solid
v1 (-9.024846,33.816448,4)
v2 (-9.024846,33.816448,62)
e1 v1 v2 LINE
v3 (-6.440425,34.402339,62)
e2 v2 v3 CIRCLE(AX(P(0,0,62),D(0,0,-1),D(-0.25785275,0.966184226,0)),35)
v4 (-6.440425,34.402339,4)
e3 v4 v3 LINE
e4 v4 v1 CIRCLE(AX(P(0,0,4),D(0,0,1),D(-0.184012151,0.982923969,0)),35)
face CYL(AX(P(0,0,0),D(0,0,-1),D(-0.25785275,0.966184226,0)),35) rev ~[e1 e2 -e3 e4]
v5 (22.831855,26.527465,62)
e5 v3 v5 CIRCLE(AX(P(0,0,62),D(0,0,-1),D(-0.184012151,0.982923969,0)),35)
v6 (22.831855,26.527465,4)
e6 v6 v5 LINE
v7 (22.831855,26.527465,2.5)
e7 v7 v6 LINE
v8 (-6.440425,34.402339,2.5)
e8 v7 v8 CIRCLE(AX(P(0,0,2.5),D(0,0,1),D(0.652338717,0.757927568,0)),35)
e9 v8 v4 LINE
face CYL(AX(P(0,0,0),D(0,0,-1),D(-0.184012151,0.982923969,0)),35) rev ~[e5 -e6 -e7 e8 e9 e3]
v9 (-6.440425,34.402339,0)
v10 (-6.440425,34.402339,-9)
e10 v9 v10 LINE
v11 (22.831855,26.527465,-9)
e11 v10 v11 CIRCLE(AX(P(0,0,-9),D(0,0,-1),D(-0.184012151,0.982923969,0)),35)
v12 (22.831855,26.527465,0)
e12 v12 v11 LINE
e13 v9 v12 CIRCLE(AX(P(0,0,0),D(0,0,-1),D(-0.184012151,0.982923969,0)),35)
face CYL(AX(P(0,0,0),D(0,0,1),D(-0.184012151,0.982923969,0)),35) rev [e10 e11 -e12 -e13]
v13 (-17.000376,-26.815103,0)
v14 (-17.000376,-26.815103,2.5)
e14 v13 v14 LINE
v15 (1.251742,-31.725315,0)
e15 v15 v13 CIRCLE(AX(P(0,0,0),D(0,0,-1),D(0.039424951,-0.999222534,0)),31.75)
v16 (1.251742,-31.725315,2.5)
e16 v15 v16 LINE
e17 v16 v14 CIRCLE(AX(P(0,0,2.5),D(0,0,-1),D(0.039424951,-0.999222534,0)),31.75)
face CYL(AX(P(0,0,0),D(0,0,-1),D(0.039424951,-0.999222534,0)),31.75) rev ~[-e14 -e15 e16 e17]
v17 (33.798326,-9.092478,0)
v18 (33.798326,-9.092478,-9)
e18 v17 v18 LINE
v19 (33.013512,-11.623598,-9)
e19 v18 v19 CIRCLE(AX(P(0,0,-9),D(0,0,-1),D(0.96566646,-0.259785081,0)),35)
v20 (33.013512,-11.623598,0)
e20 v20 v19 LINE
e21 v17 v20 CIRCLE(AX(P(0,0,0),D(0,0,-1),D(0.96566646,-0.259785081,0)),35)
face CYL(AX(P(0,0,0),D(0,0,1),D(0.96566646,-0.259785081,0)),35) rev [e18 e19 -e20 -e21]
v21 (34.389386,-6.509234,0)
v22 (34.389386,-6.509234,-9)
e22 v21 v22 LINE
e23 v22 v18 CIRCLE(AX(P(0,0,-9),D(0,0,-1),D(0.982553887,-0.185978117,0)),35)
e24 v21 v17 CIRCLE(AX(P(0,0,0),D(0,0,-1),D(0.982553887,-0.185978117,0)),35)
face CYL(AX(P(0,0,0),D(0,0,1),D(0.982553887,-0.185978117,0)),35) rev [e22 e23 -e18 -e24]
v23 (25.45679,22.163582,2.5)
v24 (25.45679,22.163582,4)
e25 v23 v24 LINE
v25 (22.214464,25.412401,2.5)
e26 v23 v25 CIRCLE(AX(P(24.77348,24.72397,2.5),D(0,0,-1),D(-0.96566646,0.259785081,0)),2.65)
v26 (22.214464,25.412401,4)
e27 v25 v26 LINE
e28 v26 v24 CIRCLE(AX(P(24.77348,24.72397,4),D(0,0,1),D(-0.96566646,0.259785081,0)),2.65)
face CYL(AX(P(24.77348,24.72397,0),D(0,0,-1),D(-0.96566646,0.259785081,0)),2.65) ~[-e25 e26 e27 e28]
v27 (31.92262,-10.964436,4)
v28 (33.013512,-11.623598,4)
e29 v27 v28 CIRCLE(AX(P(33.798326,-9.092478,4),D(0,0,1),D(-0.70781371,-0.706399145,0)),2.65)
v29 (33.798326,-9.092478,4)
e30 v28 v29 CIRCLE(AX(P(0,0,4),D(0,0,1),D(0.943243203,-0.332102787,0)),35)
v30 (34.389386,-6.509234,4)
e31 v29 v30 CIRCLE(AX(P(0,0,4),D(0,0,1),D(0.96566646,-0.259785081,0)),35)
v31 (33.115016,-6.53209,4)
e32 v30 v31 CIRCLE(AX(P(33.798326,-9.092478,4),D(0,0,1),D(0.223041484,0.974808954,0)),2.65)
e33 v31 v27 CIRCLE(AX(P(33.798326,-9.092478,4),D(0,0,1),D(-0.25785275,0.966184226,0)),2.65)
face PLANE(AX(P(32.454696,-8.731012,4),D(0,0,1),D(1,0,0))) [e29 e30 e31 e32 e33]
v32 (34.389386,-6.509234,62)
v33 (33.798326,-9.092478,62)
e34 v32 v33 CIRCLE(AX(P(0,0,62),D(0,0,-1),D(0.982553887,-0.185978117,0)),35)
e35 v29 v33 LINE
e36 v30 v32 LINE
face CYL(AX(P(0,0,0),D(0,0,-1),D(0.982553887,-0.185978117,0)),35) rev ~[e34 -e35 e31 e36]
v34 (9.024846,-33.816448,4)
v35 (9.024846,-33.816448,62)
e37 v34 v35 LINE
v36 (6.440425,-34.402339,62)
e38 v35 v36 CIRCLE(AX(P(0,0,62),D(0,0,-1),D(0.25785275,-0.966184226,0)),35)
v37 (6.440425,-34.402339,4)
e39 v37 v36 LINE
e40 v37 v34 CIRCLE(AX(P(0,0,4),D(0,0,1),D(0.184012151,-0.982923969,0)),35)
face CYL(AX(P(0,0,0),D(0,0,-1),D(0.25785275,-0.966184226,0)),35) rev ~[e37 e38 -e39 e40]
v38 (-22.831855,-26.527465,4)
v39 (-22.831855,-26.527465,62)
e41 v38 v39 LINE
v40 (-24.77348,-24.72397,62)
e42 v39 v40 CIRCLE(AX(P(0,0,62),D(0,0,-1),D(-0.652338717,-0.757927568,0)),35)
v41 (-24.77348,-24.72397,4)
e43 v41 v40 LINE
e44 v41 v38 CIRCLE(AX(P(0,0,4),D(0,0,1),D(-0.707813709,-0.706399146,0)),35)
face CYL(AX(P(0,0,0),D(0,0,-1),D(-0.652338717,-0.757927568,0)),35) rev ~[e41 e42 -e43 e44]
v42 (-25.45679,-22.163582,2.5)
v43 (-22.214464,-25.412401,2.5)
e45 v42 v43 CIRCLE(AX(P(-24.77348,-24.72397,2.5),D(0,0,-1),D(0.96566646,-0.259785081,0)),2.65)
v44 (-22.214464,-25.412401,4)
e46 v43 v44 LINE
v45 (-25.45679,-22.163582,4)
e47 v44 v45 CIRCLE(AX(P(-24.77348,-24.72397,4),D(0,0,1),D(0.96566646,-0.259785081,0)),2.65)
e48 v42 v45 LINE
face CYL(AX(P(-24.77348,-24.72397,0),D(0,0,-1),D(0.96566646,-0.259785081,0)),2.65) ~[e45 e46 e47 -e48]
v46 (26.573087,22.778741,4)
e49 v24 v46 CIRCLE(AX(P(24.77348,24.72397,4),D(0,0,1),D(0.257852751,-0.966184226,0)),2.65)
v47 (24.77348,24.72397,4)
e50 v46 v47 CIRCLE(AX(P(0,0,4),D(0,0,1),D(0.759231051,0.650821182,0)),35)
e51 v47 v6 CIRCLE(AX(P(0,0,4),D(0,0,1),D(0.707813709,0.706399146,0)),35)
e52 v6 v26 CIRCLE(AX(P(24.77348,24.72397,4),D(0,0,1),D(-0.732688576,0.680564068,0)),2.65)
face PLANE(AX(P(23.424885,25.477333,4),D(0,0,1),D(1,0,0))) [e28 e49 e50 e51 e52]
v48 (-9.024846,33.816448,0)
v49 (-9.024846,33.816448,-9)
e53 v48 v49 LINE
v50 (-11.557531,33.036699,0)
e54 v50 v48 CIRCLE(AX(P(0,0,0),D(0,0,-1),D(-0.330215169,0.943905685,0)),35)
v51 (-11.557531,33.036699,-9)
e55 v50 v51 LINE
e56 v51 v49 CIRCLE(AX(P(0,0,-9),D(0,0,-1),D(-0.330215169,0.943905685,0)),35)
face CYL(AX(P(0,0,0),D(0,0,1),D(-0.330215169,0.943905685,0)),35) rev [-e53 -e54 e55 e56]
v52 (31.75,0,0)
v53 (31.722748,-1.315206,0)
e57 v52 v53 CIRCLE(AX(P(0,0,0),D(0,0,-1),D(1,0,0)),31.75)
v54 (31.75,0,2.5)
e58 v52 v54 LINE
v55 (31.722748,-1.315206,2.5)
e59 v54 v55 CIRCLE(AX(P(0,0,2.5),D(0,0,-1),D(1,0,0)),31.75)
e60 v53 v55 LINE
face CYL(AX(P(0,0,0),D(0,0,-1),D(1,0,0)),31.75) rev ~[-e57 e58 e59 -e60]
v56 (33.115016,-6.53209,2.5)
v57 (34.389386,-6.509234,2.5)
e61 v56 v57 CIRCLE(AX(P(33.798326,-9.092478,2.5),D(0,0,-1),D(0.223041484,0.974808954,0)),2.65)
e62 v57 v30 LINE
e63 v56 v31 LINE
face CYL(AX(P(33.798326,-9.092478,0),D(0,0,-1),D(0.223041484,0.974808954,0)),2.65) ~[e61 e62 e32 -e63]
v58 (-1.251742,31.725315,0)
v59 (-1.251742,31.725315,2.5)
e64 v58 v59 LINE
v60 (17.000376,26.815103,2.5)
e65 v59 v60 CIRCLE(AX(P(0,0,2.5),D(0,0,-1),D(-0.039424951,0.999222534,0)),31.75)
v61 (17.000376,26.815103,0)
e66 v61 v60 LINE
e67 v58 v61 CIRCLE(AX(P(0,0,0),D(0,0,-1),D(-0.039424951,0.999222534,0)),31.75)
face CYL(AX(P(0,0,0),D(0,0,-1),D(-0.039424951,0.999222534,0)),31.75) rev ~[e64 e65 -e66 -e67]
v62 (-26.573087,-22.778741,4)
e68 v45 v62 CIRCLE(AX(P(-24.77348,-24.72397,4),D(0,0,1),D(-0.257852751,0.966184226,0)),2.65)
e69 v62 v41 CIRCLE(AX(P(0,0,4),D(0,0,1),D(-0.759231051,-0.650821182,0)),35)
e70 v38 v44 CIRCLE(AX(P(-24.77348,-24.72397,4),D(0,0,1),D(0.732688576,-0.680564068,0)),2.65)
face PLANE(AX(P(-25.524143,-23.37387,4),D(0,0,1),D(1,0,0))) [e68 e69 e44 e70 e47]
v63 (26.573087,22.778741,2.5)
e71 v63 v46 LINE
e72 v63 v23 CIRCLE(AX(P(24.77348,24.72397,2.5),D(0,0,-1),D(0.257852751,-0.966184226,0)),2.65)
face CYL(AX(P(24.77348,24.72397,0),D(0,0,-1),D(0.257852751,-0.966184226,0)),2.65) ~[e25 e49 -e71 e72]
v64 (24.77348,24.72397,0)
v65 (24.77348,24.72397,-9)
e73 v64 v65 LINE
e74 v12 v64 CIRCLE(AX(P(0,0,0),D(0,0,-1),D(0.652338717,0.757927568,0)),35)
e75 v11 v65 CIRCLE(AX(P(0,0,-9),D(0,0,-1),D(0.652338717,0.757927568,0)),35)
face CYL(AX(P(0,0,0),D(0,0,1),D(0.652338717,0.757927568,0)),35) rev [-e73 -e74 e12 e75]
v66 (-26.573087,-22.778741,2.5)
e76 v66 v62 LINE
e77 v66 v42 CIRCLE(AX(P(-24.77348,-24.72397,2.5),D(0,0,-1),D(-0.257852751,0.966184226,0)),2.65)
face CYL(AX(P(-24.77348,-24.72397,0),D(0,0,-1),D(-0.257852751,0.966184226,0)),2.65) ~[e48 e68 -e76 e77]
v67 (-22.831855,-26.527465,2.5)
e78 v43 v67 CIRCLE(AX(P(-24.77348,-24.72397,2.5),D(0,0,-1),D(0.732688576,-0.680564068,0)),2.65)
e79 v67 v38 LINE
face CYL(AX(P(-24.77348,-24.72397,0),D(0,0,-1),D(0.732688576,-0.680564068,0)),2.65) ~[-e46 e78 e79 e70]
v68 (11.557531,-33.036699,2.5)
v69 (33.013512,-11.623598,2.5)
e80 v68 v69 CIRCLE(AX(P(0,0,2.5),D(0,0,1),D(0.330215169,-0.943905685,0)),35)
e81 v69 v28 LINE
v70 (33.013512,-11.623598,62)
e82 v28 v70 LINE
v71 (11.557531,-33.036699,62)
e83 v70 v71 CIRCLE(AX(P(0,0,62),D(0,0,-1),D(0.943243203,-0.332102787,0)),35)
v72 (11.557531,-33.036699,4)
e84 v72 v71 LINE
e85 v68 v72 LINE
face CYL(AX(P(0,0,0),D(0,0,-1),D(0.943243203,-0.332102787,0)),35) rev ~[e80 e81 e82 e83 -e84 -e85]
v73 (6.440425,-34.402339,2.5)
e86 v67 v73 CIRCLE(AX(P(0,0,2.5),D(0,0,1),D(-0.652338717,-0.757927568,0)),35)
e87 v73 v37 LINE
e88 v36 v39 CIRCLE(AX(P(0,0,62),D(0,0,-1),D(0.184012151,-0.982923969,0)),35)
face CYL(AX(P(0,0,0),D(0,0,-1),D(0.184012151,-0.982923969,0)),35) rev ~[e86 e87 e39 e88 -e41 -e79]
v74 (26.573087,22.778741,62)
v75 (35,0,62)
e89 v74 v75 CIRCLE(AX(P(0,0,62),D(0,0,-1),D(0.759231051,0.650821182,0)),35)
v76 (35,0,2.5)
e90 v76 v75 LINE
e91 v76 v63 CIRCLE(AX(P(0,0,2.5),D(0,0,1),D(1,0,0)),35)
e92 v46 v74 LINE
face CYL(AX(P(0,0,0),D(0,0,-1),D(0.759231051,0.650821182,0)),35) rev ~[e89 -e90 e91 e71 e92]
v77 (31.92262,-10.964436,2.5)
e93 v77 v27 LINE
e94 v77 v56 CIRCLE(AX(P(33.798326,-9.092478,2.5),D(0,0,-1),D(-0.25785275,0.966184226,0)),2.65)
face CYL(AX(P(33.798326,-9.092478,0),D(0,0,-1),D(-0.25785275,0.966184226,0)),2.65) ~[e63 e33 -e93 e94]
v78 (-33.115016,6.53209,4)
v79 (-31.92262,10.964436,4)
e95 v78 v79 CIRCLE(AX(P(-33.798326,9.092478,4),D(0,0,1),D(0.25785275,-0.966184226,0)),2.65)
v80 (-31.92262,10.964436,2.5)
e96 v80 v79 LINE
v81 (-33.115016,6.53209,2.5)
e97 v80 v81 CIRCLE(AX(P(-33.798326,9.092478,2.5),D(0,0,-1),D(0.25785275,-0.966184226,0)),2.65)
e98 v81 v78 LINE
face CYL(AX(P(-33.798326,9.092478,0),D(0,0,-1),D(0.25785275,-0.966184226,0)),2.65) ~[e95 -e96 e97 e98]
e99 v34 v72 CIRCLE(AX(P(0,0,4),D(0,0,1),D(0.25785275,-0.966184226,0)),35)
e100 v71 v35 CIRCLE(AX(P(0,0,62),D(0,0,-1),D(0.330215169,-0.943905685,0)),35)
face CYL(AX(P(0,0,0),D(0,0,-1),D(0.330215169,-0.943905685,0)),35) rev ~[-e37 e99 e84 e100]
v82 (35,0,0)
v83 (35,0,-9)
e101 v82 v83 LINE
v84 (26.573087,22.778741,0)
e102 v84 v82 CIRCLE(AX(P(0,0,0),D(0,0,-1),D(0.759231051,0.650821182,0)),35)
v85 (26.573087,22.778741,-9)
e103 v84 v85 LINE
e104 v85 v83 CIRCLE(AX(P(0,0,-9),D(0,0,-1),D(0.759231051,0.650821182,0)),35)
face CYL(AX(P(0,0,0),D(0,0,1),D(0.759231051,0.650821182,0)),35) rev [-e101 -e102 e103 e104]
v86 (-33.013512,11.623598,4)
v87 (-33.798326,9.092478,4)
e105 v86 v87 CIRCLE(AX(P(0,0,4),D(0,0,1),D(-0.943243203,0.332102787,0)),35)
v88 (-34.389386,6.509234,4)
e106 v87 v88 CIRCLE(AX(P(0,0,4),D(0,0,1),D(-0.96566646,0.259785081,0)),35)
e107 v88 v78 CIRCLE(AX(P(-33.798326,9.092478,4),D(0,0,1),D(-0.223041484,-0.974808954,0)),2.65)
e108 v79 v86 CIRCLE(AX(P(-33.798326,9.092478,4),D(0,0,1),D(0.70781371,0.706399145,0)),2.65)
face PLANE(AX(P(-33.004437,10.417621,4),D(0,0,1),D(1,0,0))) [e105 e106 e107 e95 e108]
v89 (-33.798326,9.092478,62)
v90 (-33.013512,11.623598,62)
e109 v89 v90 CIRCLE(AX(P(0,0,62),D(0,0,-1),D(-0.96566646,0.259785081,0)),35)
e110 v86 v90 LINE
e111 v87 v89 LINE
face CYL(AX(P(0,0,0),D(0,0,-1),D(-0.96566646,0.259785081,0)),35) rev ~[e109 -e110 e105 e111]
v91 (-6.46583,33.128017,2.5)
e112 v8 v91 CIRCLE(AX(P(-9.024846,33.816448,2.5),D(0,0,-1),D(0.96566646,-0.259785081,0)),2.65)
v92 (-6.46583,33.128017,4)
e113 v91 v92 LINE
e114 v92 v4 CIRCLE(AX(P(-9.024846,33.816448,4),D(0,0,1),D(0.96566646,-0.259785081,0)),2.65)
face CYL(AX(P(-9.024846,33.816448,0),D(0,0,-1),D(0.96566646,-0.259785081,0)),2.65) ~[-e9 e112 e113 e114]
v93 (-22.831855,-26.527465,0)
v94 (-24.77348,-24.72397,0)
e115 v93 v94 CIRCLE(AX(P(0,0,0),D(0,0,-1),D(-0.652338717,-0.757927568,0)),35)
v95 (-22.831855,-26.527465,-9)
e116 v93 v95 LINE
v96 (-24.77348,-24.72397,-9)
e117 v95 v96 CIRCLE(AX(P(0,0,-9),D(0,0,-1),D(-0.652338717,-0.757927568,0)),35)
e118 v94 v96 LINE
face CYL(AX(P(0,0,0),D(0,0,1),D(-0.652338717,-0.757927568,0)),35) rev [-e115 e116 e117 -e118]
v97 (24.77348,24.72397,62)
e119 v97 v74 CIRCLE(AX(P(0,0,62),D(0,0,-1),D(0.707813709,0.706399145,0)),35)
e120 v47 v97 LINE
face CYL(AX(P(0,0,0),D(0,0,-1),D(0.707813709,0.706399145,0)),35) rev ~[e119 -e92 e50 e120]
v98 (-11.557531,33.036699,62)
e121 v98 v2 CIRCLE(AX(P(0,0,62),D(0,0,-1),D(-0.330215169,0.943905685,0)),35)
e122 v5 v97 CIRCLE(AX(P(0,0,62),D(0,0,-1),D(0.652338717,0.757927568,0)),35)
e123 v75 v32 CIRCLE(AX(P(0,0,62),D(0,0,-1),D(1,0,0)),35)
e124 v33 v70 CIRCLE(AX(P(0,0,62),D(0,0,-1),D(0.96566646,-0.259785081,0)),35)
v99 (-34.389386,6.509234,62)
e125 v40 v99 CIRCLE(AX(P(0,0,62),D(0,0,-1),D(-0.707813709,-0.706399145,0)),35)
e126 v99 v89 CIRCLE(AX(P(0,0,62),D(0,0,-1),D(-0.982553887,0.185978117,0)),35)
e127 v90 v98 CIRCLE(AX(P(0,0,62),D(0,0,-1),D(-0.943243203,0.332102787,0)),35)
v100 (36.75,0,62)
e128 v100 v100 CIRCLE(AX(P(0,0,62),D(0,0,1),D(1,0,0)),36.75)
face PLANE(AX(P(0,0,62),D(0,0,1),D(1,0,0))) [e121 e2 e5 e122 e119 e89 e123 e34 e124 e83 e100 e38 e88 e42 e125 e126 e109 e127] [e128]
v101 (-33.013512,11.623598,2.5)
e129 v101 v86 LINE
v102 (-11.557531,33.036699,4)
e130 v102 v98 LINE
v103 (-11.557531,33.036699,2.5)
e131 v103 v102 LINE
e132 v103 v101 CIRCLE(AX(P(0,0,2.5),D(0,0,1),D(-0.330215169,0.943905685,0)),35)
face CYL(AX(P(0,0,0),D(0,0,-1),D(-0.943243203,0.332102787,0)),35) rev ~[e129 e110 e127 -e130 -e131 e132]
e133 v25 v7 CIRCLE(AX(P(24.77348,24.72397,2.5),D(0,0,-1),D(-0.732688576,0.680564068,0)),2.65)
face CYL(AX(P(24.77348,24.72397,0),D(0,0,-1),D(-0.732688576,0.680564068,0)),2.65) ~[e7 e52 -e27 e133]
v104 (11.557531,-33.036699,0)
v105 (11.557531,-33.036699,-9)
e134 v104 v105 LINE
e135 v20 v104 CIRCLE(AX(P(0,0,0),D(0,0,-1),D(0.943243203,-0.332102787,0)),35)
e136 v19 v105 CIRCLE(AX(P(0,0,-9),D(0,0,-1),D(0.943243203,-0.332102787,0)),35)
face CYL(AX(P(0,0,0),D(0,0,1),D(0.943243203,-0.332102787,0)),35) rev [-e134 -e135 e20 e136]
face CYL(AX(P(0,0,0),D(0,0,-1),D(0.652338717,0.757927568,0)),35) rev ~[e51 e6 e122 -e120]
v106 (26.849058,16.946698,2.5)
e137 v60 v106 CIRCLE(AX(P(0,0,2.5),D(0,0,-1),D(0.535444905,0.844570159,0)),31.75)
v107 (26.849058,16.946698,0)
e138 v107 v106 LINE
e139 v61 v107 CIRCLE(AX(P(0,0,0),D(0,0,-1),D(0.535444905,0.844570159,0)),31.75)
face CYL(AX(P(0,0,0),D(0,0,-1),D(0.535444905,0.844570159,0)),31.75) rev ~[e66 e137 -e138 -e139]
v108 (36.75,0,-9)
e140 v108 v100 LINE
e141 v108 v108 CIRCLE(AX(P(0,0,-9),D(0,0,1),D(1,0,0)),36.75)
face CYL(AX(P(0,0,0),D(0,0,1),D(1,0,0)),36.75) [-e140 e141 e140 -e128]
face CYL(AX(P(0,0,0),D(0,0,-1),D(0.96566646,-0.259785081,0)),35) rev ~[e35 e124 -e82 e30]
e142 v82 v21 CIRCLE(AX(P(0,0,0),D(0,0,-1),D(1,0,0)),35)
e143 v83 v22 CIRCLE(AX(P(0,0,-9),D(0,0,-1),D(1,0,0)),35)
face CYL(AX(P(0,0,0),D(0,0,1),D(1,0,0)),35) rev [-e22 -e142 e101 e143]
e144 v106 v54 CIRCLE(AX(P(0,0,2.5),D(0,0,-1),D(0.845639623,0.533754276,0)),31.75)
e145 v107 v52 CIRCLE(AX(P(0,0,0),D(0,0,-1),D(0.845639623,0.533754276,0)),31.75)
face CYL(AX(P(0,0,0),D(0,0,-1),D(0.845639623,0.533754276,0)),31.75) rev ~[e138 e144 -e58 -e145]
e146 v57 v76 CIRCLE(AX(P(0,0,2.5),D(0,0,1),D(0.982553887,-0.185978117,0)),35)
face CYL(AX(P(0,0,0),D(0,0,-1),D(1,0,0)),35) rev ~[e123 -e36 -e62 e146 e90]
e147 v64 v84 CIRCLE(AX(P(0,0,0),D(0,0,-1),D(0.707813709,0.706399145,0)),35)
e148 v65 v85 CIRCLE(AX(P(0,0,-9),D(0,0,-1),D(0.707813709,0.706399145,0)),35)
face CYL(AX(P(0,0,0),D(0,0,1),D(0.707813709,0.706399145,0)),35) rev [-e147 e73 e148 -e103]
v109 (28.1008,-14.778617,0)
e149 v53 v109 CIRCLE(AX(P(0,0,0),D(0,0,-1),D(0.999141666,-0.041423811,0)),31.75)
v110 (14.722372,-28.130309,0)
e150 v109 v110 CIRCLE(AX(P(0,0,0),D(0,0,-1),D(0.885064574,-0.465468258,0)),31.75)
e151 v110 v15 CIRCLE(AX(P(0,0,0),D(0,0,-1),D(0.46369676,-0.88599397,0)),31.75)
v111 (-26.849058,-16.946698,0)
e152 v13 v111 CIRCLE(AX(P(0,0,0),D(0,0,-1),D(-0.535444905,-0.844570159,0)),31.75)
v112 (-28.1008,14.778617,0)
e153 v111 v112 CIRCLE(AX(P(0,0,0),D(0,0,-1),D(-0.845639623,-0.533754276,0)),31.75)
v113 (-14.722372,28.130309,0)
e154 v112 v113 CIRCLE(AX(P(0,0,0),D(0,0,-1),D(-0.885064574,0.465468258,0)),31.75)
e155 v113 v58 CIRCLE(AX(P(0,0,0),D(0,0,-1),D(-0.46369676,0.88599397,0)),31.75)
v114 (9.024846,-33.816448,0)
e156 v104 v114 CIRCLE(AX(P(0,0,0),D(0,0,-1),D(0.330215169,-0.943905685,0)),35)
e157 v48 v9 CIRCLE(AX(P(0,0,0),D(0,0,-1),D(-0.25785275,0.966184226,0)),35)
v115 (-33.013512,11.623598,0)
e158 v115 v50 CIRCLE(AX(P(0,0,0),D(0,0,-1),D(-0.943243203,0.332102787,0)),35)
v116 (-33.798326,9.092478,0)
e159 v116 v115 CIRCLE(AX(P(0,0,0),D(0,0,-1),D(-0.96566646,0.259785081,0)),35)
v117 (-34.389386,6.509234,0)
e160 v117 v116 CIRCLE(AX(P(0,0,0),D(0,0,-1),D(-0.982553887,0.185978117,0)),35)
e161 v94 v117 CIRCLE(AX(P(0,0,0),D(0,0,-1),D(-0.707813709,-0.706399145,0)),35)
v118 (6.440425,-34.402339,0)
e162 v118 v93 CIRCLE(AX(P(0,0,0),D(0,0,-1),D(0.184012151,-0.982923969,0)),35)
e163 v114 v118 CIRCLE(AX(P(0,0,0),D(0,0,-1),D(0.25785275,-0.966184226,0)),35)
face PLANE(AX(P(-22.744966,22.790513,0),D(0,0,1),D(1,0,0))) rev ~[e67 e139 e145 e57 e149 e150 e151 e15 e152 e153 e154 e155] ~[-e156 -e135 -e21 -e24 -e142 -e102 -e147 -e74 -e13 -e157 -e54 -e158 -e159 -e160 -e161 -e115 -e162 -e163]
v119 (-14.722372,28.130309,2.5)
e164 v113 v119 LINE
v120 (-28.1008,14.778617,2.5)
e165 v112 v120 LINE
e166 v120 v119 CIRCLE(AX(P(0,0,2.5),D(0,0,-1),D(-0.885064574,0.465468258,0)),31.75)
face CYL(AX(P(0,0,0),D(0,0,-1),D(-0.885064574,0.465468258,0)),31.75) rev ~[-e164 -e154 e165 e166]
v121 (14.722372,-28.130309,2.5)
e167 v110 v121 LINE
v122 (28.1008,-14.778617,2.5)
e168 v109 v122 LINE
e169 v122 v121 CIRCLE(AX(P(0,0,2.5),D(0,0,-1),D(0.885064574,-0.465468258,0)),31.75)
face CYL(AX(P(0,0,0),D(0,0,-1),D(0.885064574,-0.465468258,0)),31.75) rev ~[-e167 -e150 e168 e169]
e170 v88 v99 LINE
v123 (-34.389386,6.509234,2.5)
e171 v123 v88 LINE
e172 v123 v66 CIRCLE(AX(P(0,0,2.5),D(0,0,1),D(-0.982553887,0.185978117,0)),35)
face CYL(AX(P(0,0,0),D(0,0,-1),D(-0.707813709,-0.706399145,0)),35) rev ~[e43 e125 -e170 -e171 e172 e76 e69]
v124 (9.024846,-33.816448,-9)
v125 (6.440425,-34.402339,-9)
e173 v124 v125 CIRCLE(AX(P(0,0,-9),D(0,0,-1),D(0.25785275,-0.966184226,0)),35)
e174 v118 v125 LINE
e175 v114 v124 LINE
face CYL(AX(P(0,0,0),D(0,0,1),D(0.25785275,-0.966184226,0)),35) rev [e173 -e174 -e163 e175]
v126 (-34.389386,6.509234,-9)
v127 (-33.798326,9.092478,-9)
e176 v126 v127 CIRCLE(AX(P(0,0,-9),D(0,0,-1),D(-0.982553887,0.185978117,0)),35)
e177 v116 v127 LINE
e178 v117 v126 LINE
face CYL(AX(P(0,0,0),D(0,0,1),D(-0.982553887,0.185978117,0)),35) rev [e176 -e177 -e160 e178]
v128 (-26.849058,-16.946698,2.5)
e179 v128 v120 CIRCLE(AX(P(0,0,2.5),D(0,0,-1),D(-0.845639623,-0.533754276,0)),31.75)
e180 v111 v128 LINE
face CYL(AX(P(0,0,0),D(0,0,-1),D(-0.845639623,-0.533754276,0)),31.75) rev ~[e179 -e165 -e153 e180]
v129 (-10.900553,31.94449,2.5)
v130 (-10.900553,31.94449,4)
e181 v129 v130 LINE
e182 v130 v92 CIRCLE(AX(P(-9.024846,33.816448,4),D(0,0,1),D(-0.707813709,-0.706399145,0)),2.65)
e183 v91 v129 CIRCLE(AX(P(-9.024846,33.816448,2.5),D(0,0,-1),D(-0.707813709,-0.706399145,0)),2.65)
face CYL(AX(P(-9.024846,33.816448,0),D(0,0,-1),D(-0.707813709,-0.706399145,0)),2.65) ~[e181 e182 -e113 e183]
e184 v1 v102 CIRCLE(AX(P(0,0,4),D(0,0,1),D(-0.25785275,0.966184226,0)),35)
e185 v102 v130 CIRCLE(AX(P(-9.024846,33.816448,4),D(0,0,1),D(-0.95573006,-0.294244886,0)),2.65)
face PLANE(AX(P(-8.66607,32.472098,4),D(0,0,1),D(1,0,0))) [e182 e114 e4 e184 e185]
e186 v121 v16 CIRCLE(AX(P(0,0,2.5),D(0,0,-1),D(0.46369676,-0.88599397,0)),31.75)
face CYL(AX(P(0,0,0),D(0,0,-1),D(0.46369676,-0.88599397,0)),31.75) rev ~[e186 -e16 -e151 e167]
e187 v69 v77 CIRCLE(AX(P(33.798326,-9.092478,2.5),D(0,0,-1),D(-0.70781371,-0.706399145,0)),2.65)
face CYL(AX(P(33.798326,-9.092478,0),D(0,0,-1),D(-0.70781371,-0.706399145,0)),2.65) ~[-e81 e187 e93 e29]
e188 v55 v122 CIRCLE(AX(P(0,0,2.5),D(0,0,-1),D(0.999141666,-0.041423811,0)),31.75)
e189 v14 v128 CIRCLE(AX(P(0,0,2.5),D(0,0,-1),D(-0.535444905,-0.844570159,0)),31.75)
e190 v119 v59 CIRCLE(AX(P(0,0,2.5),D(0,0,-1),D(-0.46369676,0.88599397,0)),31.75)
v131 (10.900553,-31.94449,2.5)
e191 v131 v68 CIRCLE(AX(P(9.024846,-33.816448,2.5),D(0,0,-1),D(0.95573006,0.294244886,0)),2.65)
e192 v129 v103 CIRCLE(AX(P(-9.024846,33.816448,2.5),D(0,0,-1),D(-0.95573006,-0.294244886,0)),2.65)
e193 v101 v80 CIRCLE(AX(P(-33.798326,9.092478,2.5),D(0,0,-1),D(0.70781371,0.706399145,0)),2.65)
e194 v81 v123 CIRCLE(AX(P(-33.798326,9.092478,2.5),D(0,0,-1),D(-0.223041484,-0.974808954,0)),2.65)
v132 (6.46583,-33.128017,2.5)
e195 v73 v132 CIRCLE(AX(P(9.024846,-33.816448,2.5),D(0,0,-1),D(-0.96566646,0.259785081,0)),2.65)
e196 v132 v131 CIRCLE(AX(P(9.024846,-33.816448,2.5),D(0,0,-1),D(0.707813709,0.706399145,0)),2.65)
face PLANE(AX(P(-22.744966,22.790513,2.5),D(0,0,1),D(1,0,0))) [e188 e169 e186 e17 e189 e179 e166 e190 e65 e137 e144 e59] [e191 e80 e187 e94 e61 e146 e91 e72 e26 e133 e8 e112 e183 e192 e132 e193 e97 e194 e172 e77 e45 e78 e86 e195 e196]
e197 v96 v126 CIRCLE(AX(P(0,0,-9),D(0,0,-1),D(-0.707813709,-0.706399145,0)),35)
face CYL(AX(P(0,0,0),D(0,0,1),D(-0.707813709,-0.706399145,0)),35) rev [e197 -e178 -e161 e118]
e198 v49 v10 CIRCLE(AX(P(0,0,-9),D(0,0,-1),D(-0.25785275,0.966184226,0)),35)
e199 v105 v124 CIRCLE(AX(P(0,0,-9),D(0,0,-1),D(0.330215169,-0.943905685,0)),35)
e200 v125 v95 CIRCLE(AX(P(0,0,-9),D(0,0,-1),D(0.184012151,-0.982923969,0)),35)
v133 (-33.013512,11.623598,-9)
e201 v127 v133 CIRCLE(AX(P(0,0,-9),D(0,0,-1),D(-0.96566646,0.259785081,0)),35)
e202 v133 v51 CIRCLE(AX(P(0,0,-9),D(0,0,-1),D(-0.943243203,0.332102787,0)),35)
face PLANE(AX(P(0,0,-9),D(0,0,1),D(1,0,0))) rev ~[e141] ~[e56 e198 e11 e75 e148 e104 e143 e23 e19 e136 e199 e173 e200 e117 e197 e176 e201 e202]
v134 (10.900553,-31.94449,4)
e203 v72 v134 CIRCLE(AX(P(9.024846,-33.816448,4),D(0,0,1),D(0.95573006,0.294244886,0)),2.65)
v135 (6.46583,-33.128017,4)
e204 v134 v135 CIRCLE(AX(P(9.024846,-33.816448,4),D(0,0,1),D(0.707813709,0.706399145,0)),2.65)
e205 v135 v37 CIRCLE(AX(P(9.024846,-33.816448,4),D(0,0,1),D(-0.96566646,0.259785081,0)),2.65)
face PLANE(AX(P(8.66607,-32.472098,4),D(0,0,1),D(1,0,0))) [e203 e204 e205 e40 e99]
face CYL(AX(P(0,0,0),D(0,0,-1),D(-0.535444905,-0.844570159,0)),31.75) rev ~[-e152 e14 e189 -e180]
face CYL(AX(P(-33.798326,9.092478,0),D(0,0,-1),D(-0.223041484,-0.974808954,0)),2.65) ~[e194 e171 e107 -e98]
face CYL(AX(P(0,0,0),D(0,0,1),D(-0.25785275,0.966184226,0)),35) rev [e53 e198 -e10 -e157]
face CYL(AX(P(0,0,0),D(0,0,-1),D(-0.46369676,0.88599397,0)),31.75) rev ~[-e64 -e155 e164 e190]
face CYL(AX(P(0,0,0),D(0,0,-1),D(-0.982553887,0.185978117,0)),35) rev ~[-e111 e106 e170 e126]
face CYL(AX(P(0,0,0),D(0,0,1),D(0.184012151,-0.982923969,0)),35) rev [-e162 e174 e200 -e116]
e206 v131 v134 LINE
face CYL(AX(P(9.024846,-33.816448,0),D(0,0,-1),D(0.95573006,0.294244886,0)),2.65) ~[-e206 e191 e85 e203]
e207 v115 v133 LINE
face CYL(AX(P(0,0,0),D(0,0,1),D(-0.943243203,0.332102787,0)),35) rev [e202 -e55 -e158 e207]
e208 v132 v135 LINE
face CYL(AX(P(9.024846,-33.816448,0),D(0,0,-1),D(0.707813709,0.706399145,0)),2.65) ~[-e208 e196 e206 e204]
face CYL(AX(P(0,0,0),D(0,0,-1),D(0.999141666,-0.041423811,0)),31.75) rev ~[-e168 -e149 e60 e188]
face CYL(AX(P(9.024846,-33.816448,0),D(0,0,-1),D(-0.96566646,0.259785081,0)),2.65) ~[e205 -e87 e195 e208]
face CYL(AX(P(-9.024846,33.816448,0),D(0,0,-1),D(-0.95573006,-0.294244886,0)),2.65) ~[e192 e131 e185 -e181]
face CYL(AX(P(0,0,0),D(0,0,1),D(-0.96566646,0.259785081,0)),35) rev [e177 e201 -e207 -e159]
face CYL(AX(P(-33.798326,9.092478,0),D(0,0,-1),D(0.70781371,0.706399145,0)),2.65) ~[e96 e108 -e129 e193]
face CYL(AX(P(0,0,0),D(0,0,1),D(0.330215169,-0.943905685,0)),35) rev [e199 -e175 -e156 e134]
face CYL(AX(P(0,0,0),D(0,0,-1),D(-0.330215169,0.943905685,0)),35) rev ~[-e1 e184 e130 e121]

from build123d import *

# Parameters (mm, degrees)
F0_R     = 36.75
F1_DEPTH = 9
F2_DEPTH = 62
F3_DEPTH = 2.5
F4_DEPTH = 4


# Not quite as in the source:
# - a feature names something its author has since deleted; it is built from what else it names


with BuildPart() as f1:
    # F0 (on Top) → F1 (new body)
    with BuildSketch(Plane.XY):
        Circle(F0_R)
        with BuildLine():
            ThreePointArc((26.5730867913, 22.7787413695), (32.825737141, 12.1437630556), (35, 0))
            ThreePointArc((35, 0), (34.847012146, -3.2689057028), (34.3893860289, -6.5092340988))
            ThreePointArc((34.3893860289, -6.5092340988), (34.1183133858, -7.8064519285), (33.7983260972, -9.0924778266))
            ThreePointArc((33.7983260972, -9.0924778266), (33.4298829217, -10.3654680472), (33.0135120879, -11.6235975335))
            ThreePointArc((33.0135120879, -11.6235975335), (24.7239700923, -24.7734798298), (11.5575309257, -33.036698971))
            ThreePointArc((11.5575309257, -33.036698971), (10.2985710094, -33.4505520906), (9.0248462674, -33.8164479189))
            ThreePointArc((9.0248462674, -33.8164479189), (7.7381828098, -34.1338618794), (6.4404252966, -34.402338903))
            ThreePointArc((6.4404252966, -34.402338903), (-9.0924778266, -33.7983260972), (-22.8318551032, -26.5274648722))
            ThreePointArc((-22.8318551032, -26.5274648722), (-23.8197423763, -25.6441001621), (-24.7734798298, -24.7239700923))
            ThreePointArc((-24.7734798298, -24.7239700923), (-25.6917001119, -23.7683938321), (-26.5730867913, -22.7787413695))
            ThreePointArc((-26.5730867913, -22.7787413695), (-33.8164479189, -9.0248462674), (-34.3893860289, 6.5092340988))
            ThreePointArc((-34.3893860289, 6.5092340988), (-34.1183133858, 7.8064519285), (-33.7983260972, 9.0924778266))
            ThreePointArc((-33.7983260972, 9.0924778266), (-33.4298829217, 10.3654680472), (-33.0135120879, 11.6235975335))
            ThreePointArc((-33.0135120879, 11.6235975335), (-24.7239700923, 24.7734798298), (-11.5575309257, 33.036698971))
            ThreePointArc((-11.5575309257, 33.036698971), (-10.2985710094, 33.4505520906), (-9.0248462674, 33.8164479189))
            ThreePointArc((-9.0248462674, 33.8164479189), (-7.7381828098, 34.1338618794), (-6.4404252966, 34.402338903))
            ThreePointArc((-6.4404252966, 34.402338903), (9.0924778266, 33.7983260972), (22.8318551032, 26.5274648722))
            ThreePointArc((22.8318551032, 26.5274648722), (23.8197423763, 25.6441001621), (24.7734798298, 24.7239700923))
            ThreePointArc((24.7734798298, 24.7239700923), (25.6917001119, 23.7683938321), (26.5730867913, 22.7787413695))
        make_face(mode=Mode.SUBTRACT)
    extrude(amount=-F1_DEPTH)

    # F0 (on Top) → F2 (join)
    with BuildSketch(Plane.XY):
        Circle(F0_R)
        with BuildLine():
            ThreePointArc((26.5730867913, 22.7787413695), (32.825737141, 12.1437630556), (35, 0))
            ThreePointArc((35, 0), (34.847012146, -3.2689057028), (34.3893860289, -6.5092340988))
            ThreePointArc((34.3893860289, -6.5092340988), (34.1183133858, -7.8064519285), (33.7983260972, -9.0924778266))
            ThreePointArc((33.7983260972, -9.0924778266), (33.4298829217, -10.3654680472), (33.0135120879, -11.6235975335))
            ThreePointArc((33.0135120879, -11.6235975335), (24.7239700923, -24.7734798298), (11.5575309257, -33.036698971))
            ThreePointArc((11.5575309257, -33.036698971), (10.2985710094, -33.4505520906), (9.0248462674, -33.8164479189))
            ThreePointArc((9.0248462674, -33.8164479189), (7.7381828098, -34.1338618794), (6.4404252966, -34.402338903))
            ThreePointArc((6.4404252966, -34.402338903), (-9.0924778266, -33.7983260972), (-22.8318551032, -26.5274648722))
            ThreePointArc((-22.8318551032, -26.5274648722), (-23.8197423763, -25.6441001621), (-24.7734798298, -24.7239700923))
            ThreePointArc((-24.7734798298, -24.7239700923), (-25.6917001119, -23.7683938321), (-26.5730867913, -22.7787413695))
            ThreePointArc((-26.5730867913, -22.7787413695), (-33.8164479189, -9.0248462674), (-34.3893860289, 6.5092340988))
            ThreePointArc((-34.3893860289, 6.5092340988), (-34.1183133858, 7.8064519285), (-33.7983260972, 9.0924778266))
            ThreePointArc((-33.7983260972, 9.0924778266), (-33.4298829217, 10.3654680472), (-33.0135120879, 11.6235975335))
            ThreePointArc((-33.0135120879, 11.6235975335), (-24.7239700923, 24.7734798298), (-11.5575309257, 33.036698971))
            ThreePointArc((-11.5575309257, 33.036698971), (-10.2985710094, 33.4505520906), (-9.0248462674, 33.8164479189))
            ThreePointArc((-9.0248462674, 33.8164479189), (-7.7381828098, 34.1338618794), (-6.4404252966, 34.402338903))
            ThreePointArc((-6.4404252966, 34.402338903), (9.0924778266, 33.7983260972), (22.8318551032, 26.5274648722))
            ThreePointArc((22.8318551032, 26.5274648722), (23.8197423763, 25.6441001621), (24.7734798298, 24.7239700923))
            ThreePointArc((24.7734798298, 24.7239700923), (25.6917001119, 23.7683938321), (26.5730867913, 22.7787413695))
        make_face(mode=Mode.SUBTRACT)
    extrude(amount=F2_DEPTH)

    # F0 (on Top) → F3 (join)
    with BuildSketch(Plane.XY):
        with BuildLine():
            ThreePointArc((-10.9005525974, 31.9444901833), (-11.2956848318, 32.4505078709), (-11.5575309257, 33.036698971))
            ThreePointArc((-11.5575309257, 33.036698971), (-24.7239700923, 24.7734798298), (-33.0135120879, 11.6235975335))
            ThreePointArc((-33.0135120879, 11.6235975335), (-32.4278459824, 11.3605792915), (-31.9226197672, 10.9644355621))
            Line((-31.9226197672, 10.9644355621), (-28.1008002305, 14.7786172021))
            ThreePointArc((-28.1008002305, 14.7786172021), (-22.4281728694, 22.4730852741), (-14.7223721342, 28.1303085433))
            Line((-14.7223721342, 28.1303085433), (-10.9005525974, 31.9444901833))
        make_face()
        with BuildLine():
            ThreePointArc((-31.7227478819, 1.3152059995), (-30.6599101025, 8.2481763141), (-28.1008002305, 14.7786172021))
            Line((-28.1008002305, 14.7786172021), (-31.9226197672, 10.9644355621))
            ThreePointArc((-31.9226197672, 10.9644355621), (-31.2393099784, 8.4040473626), (-33.1150163084, 6.532089627))
            Line((-33.1150163084, 6.532089627), (-31.7227478819, 1.3152059995))
        make_face()
        with BuildLine():
            ThreePointArc((-26.8490580451, -16.9466982652), (-30.6763491835, -8.1868248283), (-31.7227478819, 1.3152059995))
            Line((-31.7227478819, 1.3152059995), (-33.1150163084, 6.532089627))
            ThreePointArc((-33.1150163084, 6.532089627), (-33.7508065978, 6.442903918), (-34.3893860289, 6.5092340988))
            ThreePointArc((-34.3893860289, 6.5092340988), (-33.8164479189, -9.0248462674), (-26.5730867913, -22.7787413695))
            ThreePointArc((-26.5730867913, -22.7787413695), (-26.0524732593, -22.4030487651), (-25.4567896186, -22.1635818927))
            Line((-25.4567896186, -22.1635818927), (-26.8490580451, -16.9466982652))
        make_face()
        with BuildLine():
            Line((-31.9226197672, 10.9644355621), (-33.7983260972, 9.0924778266))
            Line((-33.7983260972, 9.0924778266), (-33.1150163084, 6.532089627))
            ThreePointArc((-33.1150163084, 6.532089627), (-31.2393099784, 8.4040473626), (-31.9226197672, 10.9644355621))
        make_face()
        with BuildLine():
            ThreePointArc((-31.9226197672, 10.9644355621), (-32.4278459824, 11.3605792915), (-33.0135120879, 11.6235975335))
            ThreePointArc((-33.0135120879, 11.6235975335), (-33.4298829217, 10.3654680472), (-33.7983260972, 9.0924778266))
            Line((-33.7983260972, 9.0924778266), (-31.9226197672, 10.9644355621))
        make_face()
        with BuildLine():
            Line((-33.1150163084, 6.532089627), (-33.7983260972, 9.0924778266))
            ThreePointArc((-33.7983260972, 9.0924778266), (-34.1183133858, 7.8064519285), (-34.3893860289, 6.5092340988))
            ThreePointArc((-34.3893860289, 6.5092340988), (-33.7508065978, 6.442903918), (-33.1150163084, 6.532089627))
        make_face()
        with BuildLine():
            Line((-22.214463711, -25.4124005563), (-17.0003757477, -26.8151025438))
            ThreePointArc((-17.0003757477, -26.8151025438), (-22.4730852741, -22.4281728694), (-26.8490580451, -16.9466982652))
            Line((-26.8490580451, -16.9466982652), (-25.4567896186, -22.1635818927))
            ThreePointArc((-25.4567896186, -22.1635818927), (-22.8977734998, -22.8520123567), (-22.214463711, -25.4124005563))
        make_face()
        with BuildLine():
            ThreePointArc((-22.8318551032, -26.5274648722), (-9.0924778266, -33.7983260972), (6.4404252966, -34.402338903))
            ThreePointArc((6.4404252966, -34.402338903), (6.3753727231, -33.7636280565), (6.4658301487, -33.1280174548))
            Line((6.4658301487, -33.1280174548), (1.2517421854, -31.7253154673))
            ThreePointArc((1.2517421854, -31.7253154673), (-8.2481763141, -30.6599101025), (-17.0003757477, -26.8151025438))
            Line((-17.0003757477, -26.8151025438), (-22.214463711, -25.4124005563))
            ThreePointArc((-22.214463711, -25.4124005563), (-22.455121766, -26.0076039529), (-22.8318551032, -26.5274648722))
        make_face()
        with BuildLine():
            Line((-25.4567896186, -22.1635818927), (-24.7734798298, -24.7239700923))
            Line((-24.7734798298, -24.7239700923), (-22.214463711, -25.4124005563))
            ThreePointArc((-22.214463711, -25.4124005563), (-22.8977734998, -22.8520123567), (-25.4567896186, -22.1635818927))
        make_face()
        with BuildLine():
            ThreePointArc((-24.7734798298, -24.7239700923), (-23.8197423763, -25.6441001621), (-22.8318551032, -26.5274648722))
            ThreePointArc((-22.8318551032, -26.5274648722), (-22.455121766, -26.0076039529), (-22.214463711, -25.4124005563))
            Line((-22.214463711, -25.4124005563), (-24.7734798298, -24.7239700923))
        make_face()
        with BuildLine():
            ThreePointArc((-26.5730867913, -22.7787413695), (-25.6917001119, -23.7683938321), (-24.7734798298, -24.7239700923))
            Line((-24.7734798298, -24.7239700923), (-25.4567896186, -22.1635818927))
            ThreePointArc((-25.4567896186, -22.1635818927), (-26.0524732593, -22.4030487651), (-26.5730867913, -22.7787413695))
        make_face()
        with BuildLine():
            ThreePointArc((6.4658301487, -33.1280174548), (8.3415364786, -31.2560597193), (10.9005525974, -31.9444901833))
            Line((10.9005525974, -31.9444901833), (14.7223721342, -28.1303085433))
            ThreePointArc((14.7223721342, -28.1303085433), (8.1868248283, -30.6763491835), (1.2517421854, -31.7253154673))
            Line((1.2517421854, -31.7253154673), (6.4658301487, -33.1280174548))
        make_face()
        with BuildLine():
            ThreePointArc((6.4404252966, -34.402338903), (7.7381828098, -34.1338618794), (9.0248462674, -33.8164479189))
            Line((9.0248462674, -33.8164479189), (6.4658301487, -33.1280174548))
            ThreePointArc((6.4658301487, -33.1280174548), (6.3753727231, -33.7636280565), (6.4404252966, -34.402338903))
        make_face()
        with BuildLine():
            Line((6.4658301487, -33.1280174548), (9.0248462674, -33.8164479189))
            Line((9.0248462674, -33.8164479189), (10.9005525974, -31.9444901833))
            ThreePointArc((10.9005525974, -31.9444901833), (8.3415364786, -31.2560597193), (6.4658301487, -33.1280174548))
        make_face()
        with BuildLine():
            ThreePointArc((9.0248462674, -33.8164479189), (10.2985710094, -33.4505520906), (11.5575309257, -33.036698971))
            ThreePointArc((11.5575309257, -33.036698971), (11.2956848318, -32.4505078709), (10.9005525974, -31.9444901833))
            Line((10.9005525974, -31.9444901833), (9.0248462674, -33.8164479189))
        make_face()
        with BuildLine():
            ThreePointArc((11.5575309257, -33.036698971), (24.7239700923, -24.7734798298), (33.0135120879, -11.6235975335))
            ThreePointArc((33.0135120879, -11.6235975335), (32.4278459824, -11.3605792915), (31.9226197672, -10.9644355621))
            Line((31.9226197672, -10.9644355621), (28.1008002305, -14.7786172021))
            ThreePointArc((28.1008002305, -14.7786172021), (22.4281728694, -22.4730852741), (14.7223721342, -28.1303085433))
            Line((14.7223721342, -28.1303085433), (10.9005525974, -31.9444901833))
            ThreePointArc((10.9005525974, -31.9444901833), (11.2956848318, -32.4505078709), (11.5575309257, -33.036698971))
        make_face()
        with BuildLine():
            ThreePointArc((31.9226197672, -10.9644355621), (31.2393099784, -8.4040473626), (33.1150163084, -6.532089627))
            Line((33.1150163084, -6.532089627), (31.7227478819, -1.3152059995))
            ThreePointArc((31.7227478819, -1.3152059995), (30.6599101025, -8.2481763141), (28.1008002305, -14.7786172021))
            Line((28.1008002305, -14.7786172021), (31.9226197672, -10.9644355621))
        make_face()
        with BuildLine():
            Line((31.9226197672, -10.9644355621), (33.7983260972, -9.0924778266))
            Line((33.7983260972, -9.0924778266), (33.1150163084, -6.532089627))
            ThreePointArc((33.1150163084, -6.532089627), (31.2393099784, -8.4040473626), (31.9226197672, -10.9644355621))
        make_face()
        with BuildLine():
            ThreePointArc((33.0135120879, -11.6235975335), (33.4298829217, -10.3654680472), (33.7983260972, -9.0924778266))
            Line((33.7983260972, -9.0924778266), (31.9226197672, -10.9644355621))
            ThreePointArc((31.9226197672, -10.9644355621), (32.4278459824, -11.3605792915), (33.0135120879, -11.6235975335))
        make_face()
        with BuildLine():
            ThreePointArc((33.7983260972, -9.0924778266), (34.1183133858, -7.8064519285), (34.3893860289, -6.5092340988))
            ThreePointArc((34.3893860289, -6.5092340988), (33.7508065978, -6.442903918), (33.1150163084, -6.532089627))
            Line((33.1150163084, -6.532089627), (33.7983260972, -9.0924778266))
        make_face()
        with BuildLine():
            ThreePointArc((34.3893860289, -6.5092340988), (34.847012146, -3.2689057028), (35, 0))
            ThreePointArc((35, 0), (32.825737141, 12.1437630556), (26.5730867913, 22.7787413695))
            ThreePointArc((26.5730867913, 22.7787413695), (26.0524732593, 22.4030487651), (25.4567896186, 22.1635818927))
            Line((25.4567896186, 22.1635818927), (26.8490580451, 16.9466982652))
            ThreePointArc((26.8490580451, 16.9466982652), (30.5001646957, 8.8205699098), (31.75, 0))
            ThreePointArc((31.75, 0), (31.7431862393, -0.657744156), (31.7227478819, -1.3152059995))
            Line((31.7227478819, -1.3152059995), (33.1150163084, -6.532089627))
            ThreePointArc((33.1150163084, -6.532089627), (33.7508065978, -6.442903918), (34.3893860289, -6.5092340988))
        make_face()
        with BuildLine():
            Line((26.8490580451, 16.9466982652), (25.4567896186, 22.1635818927))
            ThreePointArc((25.4567896186, 22.1635818927), (22.8977734998, 22.8520123567), (22.214463711, 25.4124005563))
            Line((22.214463711, 25.4124005563), (17.0003757477, 26.8151025438))
            ThreePointArc((17.0003757477, 26.8151025438), (22.4730852741, 22.4281728694), (26.8490580451, 16.9466982652))
        make_face()
        with BuildLine():
            Line((25.4567896186, 22.1635818927), (24.7734798298, 24.7239700923))
            Line((24.7734798298, 24.7239700923), (22.214463711, 25.4124005563))
            ThreePointArc((22.214463711, 25.4124005563), (22.8977734998, 22.8520123567), (25.4567896186, 22.1635818927))
        make_face()
        with BuildLine():
            ThreePointArc((25.4567896186, 22.1635818927), (26.0524732593, 22.4030487651), (26.5730867913, 22.7787413695))
            ThreePointArc((26.5730867913, 22.7787413695), (25.6917001119, 23.7683938321), (24.7734798298, 24.7239700923))
            Line((24.7734798298, 24.7239700923), (25.4567896186, 22.1635818927))
        make_face()
        with BuildLine():
            Line((22.214463711, 25.4124005563), (24.7734798298, 24.7239700923))
            ThreePointArc((24.7734798298, 24.7239700923), (23.8197423763, 25.6441001621), (22.8318551032, 26.5274648722))
            ThreePointArc((22.8318551032, 26.5274648722), (22.455121766, 26.0076039529), (22.214463711, 25.4124005563))
        make_face()
        with BuildLine():
            ThreePointArc((22.214463711, 25.4124005563), (22.455121766, 26.0076039529), (22.8318551032, 26.5274648722))
            ThreePointArc((22.8318551032, 26.5274648722), (9.0924778266, 33.7983260972), (-6.4404252966, 34.402338903))
            ThreePointArc((-6.4404252966, 34.402338903), (-6.3753727231, 33.7636280565), (-6.4658301487, 33.1280174548))
            Line((-6.4658301487, 33.1280174548), (-1.2517421854, 31.7253154673))
            ThreePointArc((-1.2517421854, 31.7253154673), (8.2481763141, 30.6599101025), (17.0003757477, 26.8151025438))
            Line((17.0003757477, 26.8151025438), (22.214463711, 25.4124005563))
        make_face()
        with BuildLine():
            Line((-1.2517421854, 31.7253154673), (-6.4658301487, 33.1280174548))
            ThreePointArc((-6.4658301487, 33.1280174548), (-8.3415364786, 31.2560597193), (-10.9005525974, 31.9444901833))
            Line((-10.9005525974, 31.9444901833), (-14.7223721342, 28.1303085433))
            ThreePointArc((-14.7223721342, 28.1303085433), (-8.1868248283, 30.6763491835), (-1.2517421854, 31.7253154673))
        make_face()
        with BuildLine():
            Line((-6.4658301487, 33.1280174548), (-9.0248462674, 33.8164479189))
            Line((-9.0248462674, 33.8164479189), (-10.9005525974, 31.9444901833))
            ThreePointArc((-10.9005525974, 31.9444901833), (-8.3415364786, 31.2560597193), (-6.4658301487, 33.1280174548))
        make_face()
        with BuildLine():
            Line((-10.9005525974, 31.9444901833), (-9.0248462674, 33.8164479189))
            ThreePointArc((-9.0248462674, 33.8164479189), (-10.2985710094, 33.4505520906), (-11.5575309257, 33.036698971))
            ThreePointArc((-11.5575309257, 33.036698971), (-11.2956848318, 32.4505078709), (-10.9005525974, 31.9444901833))
        make_face()
        with BuildLine():
            ThreePointArc((-6.4658301487, 33.1280174548), (-6.3753727231, 33.7636280565), (-6.4404252966, 34.402338903))
            ThreePointArc((-6.4404252966, 34.402338903), (-7.7381828098, 34.1338618794), (-9.0248462674, 33.8164479189))
            Line((-9.0248462674, 33.8164479189), (-6.4658301487, 33.1280174548))
        make_face()
    extrude(amount=F3_DEPTH)

    # F0 (on Top) → F4 (join)
    with BuildSketch(Plane.XY):
        with BuildLine():
            Line((6.4658301487, -33.1280174548), (9.0248462674, -33.8164479189))
            Line((9.0248462674, -33.8164479189), (10.9005525974, -31.9444901833))
            ThreePointArc((10.9005525974, -31.9444901833), (8.3415364786, -31.2560597193), (6.4658301487, -33.1280174548))
        make_face()
        with BuildLine():
            ThreePointArc((9.0248462674, -33.8164479189), (10.2985710094, -33.4505520906), (11.5575309257, -33.036698971))
            ThreePointArc((11.5575309257, -33.036698971), (11.2956848318, -32.4505078709), (10.9005525974, -31.9444901833))
            Line((10.9005525974, -31.9444901833), (9.0248462674, -33.8164479189))
        make_face()
        with BuildLine():
            ThreePointArc((6.4404252966, -34.402338903), (7.7381828098, -34.1338618794), (9.0248462674, -33.8164479189))
            Line((9.0248462674, -33.8164479189), (6.4658301487, -33.1280174548))
            ThreePointArc((6.4658301487, -33.1280174548), (6.3753727231, -33.7636280565), (6.4404252966, -34.402338903))
        make_face()
        with BuildLine():
            ThreePointArc((-26.5730867913, -22.7787413695), (-25.6917001119, -23.7683938321), (-24.7734798298, -24.7239700923))
            Line((-24.7734798298, -24.7239700923), (-25.4567896186, -22.1635818927))
            ThreePointArc((-25.4567896186, -22.1635818927), (-26.0524732593, -22.4030487651), (-26.5730867913, -22.7787413695))
        make_face()
        with BuildLine():
            Line((-25.4567896186, -22.1635818927), (-24.7734798298, -24.7239700923))
            Line((-24.7734798298, -24.7239700923), (-22.214463711, -25.4124005563))
            ThreePointArc((-22.214463711, -25.4124005563), (-22.8977734998, -22.8520123567), (-25.4567896186, -22.1635818927))
        make_face()
        with BuildLine():
            ThreePointArc((-24.7734798298, -24.7239700923), (-23.8197423763, -25.6441001621), (-22.8318551032, -26.5274648722))
            ThreePointArc((-22.8318551032, -26.5274648722), (-22.455121766, -26.0076039529), (-22.214463711, -25.4124005563))
            Line((-22.214463711, -25.4124005563), (-24.7734798298, -24.7239700923))
        make_face()
        with BuildLine():
            ThreePointArc((-31.9226197672, 10.9644355621), (-32.4278459824, 11.3605792915), (-33.0135120879, 11.6235975335))
            ThreePointArc((-33.0135120879, 11.6235975335), (-33.4298829217, 10.3654680472), (-33.7983260972, 9.0924778266))
            Line((-33.7983260972, 9.0924778266), (-31.9226197672, 10.9644355621))
        make_face()
        with BuildLine():
            Line((-31.9226197672, 10.9644355621), (-33.7983260972, 9.0924778266))
            Line((-33.7983260972, 9.0924778266), (-33.1150163084, 6.532089627))
            ThreePointArc((-33.1150163084, 6.532089627), (-31.2393099784, 8.4040473626), (-31.9226197672, 10.9644355621))
        make_face()
        with BuildLine():
            Line((-33.1150163084, 6.532089627), (-33.7983260972, 9.0924778266))
            ThreePointArc((-33.7983260972, 9.0924778266), (-34.1183133858, 7.8064519285), (-34.3893860289, 6.5092340988))
            ThreePointArc((-34.3893860289, 6.5092340988), (-33.7508065978, 6.442903918), (-33.1150163084, 6.532089627))
        make_face()
        with BuildLine():
            Line((-6.4658301487, 33.1280174548), (-9.0248462674, 33.8164479189))
            Line((-9.0248462674, 33.8164479189), (-10.9005525974, 31.9444901833))
            ThreePointArc((-10.9005525974, 31.9444901833), (-8.3415364786, 31.2560597193), (-6.4658301487, 33.1280174548))
        make_face()
        with BuildLine():
            ThreePointArc((-6.4658301487, 33.1280174548), (-6.3753727231, 33.7636280565), (-6.4404252966, 34.402338903))
            ThreePointArc((-6.4404252966, 34.402338903), (-7.7381828098, 34.1338618794), (-9.0248462674, 33.8164479189))
            Line((-9.0248462674, 33.8164479189), (-6.4658301487, 33.1280174548))
        make_face()
        with BuildLine():
            Line((-10.9005525974, 31.9444901833), (-9.0248462674, 33.8164479189))
            ThreePointArc((-9.0248462674, 33.8164479189), (-10.2985710094, 33.4505520906), (-11.5575309257, 33.036698971))
            ThreePointArc((-11.5575309257, 33.036698971), (-11.2956848318, 32.4505078709), (-10.9005525974, 31.9444901833))
        make_face()
        with BuildLine():
            Line((22.214463711, 25.4124005563), (24.7734798298, 24.7239700923))
            ThreePointArc((24.7734798298, 24.7239700923), (23.8197423763, 25.6441001621), (22.8318551032, 26.5274648722))
            ThreePointArc((22.8318551032, 26.5274648722), (22.455121766, 26.0076039529), (22.214463711, 25.4124005563))
        make_face()
        with BuildLine():
            Line((25.4567896186, 22.1635818927), (24.7734798298, 24.7239700923))
            Line((24.7734798298, 24.7239700923), (22.214463711, 25.4124005563))
            ThreePointArc((22.214463711, 25.4124005563), (22.8977734998, 22.8520123567), (25.4567896186, 22.1635818927))
        make_face()
        with BuildLine():
            ThreePointArc((25.4567896186, 22.1635818927), (26.0524732593, 22.4030487651), (26.5730867913, 22.7787413695))
            ThreePointArc((26.5730867913, 22.7787413695), (25.6917001119, 23.7683938321), (24.7734798298, 24.7239700923))
            Line((24.7734798298, 24.7239700923), (25.4567896186, 22.1635818927))
        make_face()
        with BuildLine():
            Line((31.9226197672, -10.9644355621), (33.7983260972, -9.0924778266))
            Line((33.7983260972, -9.0924778266), (33.1150163084, -6.532089627))
            ThreePointArc((33.1150163084, -6.532089627), (31.2393099784, -8.4040473626), (31.9226197672, -10.9644355621))
        make_face()
        with BuildLine():
            ThreePointArc((33.7983260972, -9.0924778266), (34.1183133858, -7.8064519285), (34.3893860289, -6.5092340988))
            ThreePointArc((34.3893860289, -6.5092340988), (33.7508065978, -6.442903918), (33.1150163084, -6.532089627))
            Line((33.1150163084, -6.532089627), (33.7983260972, -9.0924778266))
        make_face()
        with BuildLine():
            ThreePointArc((33.0135120879, -11.6235975335), (33.4298829217, -10.3654680472), (33.7983260972, -9.0924778266))
            Line((33.7983260972, -9.0924778266), (31.9226197672, -10.9644355621))
            ThreePointArc((31.9226197672, -10.9644355621), (32.4278459824, -11.3605792915), (33.0135120879, -11.6235975335))
        make_face()
    extrude(amount=F4_DEPTH)


solid = f1.part
